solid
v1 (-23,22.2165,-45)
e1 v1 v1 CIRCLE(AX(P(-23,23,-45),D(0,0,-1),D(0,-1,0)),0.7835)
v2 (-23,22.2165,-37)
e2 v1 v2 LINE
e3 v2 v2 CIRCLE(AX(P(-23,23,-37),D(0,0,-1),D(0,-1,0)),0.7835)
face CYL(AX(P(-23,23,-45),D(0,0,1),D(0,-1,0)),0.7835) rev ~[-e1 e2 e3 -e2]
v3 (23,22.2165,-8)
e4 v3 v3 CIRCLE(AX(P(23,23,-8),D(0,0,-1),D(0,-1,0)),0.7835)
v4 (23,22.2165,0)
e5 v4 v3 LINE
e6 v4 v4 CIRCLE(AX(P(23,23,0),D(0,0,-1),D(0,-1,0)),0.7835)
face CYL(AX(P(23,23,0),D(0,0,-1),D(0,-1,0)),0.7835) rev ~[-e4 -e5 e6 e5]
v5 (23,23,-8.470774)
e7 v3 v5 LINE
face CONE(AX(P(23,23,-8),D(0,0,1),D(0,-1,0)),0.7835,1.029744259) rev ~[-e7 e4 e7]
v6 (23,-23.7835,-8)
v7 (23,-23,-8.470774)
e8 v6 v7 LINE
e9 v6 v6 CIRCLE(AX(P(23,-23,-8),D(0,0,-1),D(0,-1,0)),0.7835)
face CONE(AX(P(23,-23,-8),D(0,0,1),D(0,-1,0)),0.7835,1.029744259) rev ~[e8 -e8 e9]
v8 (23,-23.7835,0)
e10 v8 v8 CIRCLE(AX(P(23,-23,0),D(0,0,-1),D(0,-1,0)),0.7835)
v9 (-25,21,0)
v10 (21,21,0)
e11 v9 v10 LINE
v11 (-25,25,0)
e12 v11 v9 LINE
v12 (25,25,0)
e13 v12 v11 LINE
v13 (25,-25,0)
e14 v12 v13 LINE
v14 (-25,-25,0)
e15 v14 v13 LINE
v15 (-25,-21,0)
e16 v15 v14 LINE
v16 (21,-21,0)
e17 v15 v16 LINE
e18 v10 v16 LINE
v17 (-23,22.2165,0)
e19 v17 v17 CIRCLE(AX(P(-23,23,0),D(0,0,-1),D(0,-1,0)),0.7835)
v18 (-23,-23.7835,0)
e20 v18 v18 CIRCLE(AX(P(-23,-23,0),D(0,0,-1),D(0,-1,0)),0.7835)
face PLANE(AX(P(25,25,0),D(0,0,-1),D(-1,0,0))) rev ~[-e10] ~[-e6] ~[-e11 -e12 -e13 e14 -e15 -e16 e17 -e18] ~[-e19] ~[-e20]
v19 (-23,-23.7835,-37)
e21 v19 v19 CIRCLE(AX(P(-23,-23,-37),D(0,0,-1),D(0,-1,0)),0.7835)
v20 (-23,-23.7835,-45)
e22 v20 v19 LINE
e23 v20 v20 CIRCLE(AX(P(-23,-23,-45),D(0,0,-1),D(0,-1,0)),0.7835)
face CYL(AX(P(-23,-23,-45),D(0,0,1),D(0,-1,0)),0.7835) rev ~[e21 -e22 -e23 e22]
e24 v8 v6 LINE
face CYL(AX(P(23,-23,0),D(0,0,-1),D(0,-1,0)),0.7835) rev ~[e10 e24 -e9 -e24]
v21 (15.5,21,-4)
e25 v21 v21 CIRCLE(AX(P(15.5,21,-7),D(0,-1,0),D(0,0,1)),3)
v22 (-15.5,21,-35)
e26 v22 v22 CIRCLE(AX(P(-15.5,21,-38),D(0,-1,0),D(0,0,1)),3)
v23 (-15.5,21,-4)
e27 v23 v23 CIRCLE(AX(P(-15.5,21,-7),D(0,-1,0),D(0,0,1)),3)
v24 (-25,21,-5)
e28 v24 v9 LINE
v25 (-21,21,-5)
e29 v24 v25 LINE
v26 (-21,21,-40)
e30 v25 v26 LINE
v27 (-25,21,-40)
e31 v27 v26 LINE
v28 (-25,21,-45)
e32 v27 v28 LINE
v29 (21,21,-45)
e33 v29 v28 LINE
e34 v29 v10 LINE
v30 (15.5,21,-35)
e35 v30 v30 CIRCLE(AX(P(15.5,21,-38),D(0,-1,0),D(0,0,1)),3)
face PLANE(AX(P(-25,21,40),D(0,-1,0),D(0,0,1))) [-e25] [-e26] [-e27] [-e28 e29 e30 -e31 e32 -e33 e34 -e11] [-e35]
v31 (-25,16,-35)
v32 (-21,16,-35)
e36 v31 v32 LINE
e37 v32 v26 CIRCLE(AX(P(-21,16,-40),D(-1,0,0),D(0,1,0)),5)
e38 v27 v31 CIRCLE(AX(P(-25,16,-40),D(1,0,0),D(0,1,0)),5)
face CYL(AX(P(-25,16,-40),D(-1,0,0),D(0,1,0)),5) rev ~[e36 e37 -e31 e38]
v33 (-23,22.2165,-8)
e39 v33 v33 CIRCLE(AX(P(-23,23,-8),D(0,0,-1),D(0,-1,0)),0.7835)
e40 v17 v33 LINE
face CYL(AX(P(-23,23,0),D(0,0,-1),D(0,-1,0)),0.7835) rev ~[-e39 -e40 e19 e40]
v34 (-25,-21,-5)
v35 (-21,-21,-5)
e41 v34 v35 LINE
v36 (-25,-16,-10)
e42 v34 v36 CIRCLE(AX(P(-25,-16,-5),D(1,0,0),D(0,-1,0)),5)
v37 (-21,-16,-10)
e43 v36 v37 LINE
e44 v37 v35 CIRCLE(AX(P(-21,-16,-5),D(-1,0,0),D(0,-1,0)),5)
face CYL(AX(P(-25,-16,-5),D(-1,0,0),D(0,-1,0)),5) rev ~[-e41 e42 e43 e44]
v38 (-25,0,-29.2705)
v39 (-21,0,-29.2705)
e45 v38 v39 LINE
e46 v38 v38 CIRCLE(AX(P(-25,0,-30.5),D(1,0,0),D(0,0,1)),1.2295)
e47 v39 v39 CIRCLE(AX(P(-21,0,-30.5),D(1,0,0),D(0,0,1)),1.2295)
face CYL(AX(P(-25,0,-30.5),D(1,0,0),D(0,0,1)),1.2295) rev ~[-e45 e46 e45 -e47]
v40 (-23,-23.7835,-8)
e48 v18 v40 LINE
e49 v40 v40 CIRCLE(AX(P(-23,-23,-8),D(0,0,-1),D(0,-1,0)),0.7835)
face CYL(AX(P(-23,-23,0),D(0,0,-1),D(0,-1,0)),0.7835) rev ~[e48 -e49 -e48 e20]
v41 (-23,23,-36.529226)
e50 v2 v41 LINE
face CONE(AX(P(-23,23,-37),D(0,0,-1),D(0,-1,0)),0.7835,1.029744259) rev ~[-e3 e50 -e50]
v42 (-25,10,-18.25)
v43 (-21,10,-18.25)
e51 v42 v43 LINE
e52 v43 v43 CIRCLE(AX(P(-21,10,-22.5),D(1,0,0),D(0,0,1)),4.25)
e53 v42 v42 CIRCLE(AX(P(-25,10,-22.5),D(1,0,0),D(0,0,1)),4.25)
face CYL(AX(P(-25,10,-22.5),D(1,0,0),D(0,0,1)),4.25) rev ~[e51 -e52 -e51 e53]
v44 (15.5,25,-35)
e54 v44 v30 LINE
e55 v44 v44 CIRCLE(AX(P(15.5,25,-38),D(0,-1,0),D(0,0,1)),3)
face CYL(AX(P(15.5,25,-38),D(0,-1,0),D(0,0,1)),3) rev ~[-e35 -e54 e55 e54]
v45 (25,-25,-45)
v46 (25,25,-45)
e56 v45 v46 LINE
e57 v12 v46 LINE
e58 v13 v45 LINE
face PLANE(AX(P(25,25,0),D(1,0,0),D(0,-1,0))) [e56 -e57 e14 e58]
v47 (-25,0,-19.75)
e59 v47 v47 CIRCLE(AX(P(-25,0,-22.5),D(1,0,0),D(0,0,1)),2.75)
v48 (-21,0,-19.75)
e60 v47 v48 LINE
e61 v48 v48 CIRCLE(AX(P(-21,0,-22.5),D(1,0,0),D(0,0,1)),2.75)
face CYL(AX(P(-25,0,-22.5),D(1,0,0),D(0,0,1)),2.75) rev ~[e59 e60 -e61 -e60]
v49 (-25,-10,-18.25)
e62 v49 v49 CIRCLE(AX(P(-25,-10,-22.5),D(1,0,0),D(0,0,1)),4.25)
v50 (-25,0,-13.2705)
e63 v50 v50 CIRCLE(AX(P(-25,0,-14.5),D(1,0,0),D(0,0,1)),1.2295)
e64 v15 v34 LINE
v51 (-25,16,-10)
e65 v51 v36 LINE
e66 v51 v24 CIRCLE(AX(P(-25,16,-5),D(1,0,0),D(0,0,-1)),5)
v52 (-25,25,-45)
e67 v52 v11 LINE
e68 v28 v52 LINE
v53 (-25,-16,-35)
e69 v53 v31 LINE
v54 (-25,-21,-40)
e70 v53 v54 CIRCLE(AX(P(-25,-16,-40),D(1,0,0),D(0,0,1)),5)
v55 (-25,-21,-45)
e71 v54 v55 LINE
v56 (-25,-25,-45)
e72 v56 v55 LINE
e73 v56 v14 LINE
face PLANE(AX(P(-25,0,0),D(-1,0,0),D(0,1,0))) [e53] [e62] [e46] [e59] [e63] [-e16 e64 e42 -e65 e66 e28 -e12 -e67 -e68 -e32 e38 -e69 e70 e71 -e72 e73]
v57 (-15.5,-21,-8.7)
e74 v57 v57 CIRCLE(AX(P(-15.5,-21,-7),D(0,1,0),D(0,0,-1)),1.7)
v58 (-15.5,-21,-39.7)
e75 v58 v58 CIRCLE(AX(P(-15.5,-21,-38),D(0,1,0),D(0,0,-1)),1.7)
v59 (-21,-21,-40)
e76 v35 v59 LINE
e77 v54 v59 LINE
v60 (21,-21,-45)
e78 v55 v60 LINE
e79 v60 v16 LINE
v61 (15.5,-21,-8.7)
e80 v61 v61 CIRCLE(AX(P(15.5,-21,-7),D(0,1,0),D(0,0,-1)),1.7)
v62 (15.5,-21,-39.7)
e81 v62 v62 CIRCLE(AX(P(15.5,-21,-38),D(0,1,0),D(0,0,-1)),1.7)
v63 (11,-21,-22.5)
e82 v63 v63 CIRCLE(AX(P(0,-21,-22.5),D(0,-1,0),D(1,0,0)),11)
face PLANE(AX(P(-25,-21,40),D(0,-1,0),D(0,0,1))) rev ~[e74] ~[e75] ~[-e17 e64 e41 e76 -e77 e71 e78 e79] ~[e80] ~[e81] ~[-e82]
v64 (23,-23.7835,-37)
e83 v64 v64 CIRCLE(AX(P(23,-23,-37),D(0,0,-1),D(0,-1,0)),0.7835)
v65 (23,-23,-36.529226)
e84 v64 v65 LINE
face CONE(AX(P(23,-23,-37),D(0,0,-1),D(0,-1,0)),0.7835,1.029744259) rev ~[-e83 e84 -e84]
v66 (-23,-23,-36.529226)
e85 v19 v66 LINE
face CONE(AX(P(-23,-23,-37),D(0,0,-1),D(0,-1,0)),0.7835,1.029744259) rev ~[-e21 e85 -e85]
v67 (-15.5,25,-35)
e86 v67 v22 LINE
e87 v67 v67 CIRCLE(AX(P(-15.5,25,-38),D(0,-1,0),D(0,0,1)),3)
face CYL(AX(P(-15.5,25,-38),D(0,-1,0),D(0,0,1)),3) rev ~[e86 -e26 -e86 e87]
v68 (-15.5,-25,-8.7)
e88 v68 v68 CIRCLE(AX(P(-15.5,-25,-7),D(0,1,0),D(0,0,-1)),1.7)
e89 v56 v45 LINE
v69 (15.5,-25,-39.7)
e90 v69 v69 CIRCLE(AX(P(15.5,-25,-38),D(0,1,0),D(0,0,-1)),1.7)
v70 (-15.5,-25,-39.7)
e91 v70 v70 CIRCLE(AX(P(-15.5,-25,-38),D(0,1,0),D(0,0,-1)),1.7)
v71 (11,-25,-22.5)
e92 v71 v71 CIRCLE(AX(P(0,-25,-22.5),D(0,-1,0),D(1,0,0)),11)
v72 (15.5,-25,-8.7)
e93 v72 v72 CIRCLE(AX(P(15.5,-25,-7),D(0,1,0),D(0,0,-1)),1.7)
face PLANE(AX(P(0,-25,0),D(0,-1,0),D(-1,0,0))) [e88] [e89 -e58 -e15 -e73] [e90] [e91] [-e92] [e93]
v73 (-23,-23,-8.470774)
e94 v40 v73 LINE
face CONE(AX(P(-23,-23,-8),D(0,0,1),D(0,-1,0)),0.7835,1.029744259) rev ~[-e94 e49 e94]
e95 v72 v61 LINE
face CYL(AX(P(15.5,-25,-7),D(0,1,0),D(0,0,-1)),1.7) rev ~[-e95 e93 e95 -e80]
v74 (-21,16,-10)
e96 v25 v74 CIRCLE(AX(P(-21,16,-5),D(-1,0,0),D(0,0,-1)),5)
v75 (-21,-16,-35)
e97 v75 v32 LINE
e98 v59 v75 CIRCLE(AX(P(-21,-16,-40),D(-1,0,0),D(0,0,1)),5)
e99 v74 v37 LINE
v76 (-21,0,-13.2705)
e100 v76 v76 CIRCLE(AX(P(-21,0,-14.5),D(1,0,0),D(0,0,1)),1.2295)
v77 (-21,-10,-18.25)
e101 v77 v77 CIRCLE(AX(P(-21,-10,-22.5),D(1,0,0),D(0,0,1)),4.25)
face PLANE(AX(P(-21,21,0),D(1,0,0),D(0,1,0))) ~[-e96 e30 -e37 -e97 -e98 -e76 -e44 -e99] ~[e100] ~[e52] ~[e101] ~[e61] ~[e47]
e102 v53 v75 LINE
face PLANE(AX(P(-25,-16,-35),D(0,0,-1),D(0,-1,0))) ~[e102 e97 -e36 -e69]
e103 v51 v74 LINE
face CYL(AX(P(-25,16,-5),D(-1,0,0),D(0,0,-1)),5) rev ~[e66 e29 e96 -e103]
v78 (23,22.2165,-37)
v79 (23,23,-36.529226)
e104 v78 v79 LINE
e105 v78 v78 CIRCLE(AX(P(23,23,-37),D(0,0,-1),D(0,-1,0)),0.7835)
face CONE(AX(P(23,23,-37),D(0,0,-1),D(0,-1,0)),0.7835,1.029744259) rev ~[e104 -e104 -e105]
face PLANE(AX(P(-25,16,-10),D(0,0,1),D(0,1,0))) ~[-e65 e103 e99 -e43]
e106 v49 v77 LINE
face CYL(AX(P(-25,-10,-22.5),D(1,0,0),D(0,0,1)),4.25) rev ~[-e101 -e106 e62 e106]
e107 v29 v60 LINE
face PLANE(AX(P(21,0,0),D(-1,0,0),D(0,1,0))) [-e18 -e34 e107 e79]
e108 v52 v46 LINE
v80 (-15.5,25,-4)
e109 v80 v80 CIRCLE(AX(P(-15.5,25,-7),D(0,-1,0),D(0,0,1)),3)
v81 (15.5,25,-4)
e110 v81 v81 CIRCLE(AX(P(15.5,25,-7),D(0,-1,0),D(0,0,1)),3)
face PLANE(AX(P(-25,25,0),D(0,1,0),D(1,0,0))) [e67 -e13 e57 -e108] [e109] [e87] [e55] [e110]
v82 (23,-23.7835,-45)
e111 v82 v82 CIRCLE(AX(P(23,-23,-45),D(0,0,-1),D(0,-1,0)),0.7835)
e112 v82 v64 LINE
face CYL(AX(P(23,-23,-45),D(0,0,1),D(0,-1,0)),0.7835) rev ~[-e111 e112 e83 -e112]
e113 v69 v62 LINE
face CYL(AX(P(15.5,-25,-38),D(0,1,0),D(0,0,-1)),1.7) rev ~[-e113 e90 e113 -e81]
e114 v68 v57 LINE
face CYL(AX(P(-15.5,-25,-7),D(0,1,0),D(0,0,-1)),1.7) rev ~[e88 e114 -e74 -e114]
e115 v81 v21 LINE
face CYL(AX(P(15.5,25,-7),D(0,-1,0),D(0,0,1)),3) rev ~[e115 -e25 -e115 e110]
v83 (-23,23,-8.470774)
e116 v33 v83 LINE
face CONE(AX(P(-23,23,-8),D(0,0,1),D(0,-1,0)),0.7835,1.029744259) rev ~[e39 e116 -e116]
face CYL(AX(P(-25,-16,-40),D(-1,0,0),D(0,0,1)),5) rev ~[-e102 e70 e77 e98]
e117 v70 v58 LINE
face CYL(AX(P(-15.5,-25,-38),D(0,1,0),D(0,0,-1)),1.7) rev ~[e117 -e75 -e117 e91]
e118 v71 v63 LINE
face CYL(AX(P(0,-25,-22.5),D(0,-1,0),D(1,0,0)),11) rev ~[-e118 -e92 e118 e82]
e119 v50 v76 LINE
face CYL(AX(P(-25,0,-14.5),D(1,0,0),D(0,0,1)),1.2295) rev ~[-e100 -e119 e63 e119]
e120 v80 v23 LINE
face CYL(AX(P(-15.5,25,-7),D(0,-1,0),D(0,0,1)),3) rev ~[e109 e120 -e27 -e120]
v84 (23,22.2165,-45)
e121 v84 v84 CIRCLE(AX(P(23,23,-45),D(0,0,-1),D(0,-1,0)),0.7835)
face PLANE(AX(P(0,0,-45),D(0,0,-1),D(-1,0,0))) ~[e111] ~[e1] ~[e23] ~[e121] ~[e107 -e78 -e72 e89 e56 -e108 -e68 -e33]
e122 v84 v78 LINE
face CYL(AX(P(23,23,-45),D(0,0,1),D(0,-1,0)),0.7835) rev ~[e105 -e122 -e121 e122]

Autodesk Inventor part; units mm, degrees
ref_plane "YZ Plane" through (0, 0, 0) normal (1, 0, 0) x (0, 1, 0)
ref_plane "XZ Plane" through (0, 0, 0) normal (0, 1, 0) x (-1, 0, 0)
sketch "Skizze1" plane through (0, 0, 0) normal (0, 0, 1) x (1, 0, 0)
  line L0 (-25, 25) -> (25, 25)
  line L1 (25, 25) -> (25, -25)
  line L2 (25, -25) -> (-25, -25)
  line L3 (-25, -25) -> (-25, 25)
  line L4 (-35, 0) -> (35, 0) projected
  line L5 (0, -35) -> (0, 35) projected
  line L6 (21, 21) -> (-21, 21)
  line L7 (-21, 21) -> (-21, -21)
  line L8 (-21, -21) -> (21, -21)
  line L9 (21, -21) -> (21, 21)
  point P0 (0, 0)
  dimension "d0" = 50
  dimension "d1" = 50
  dimension "d2" = 4
extrude "Extrusion1" add sketch "Skizze1" along normal blind 45 contours L0 L5 L6 L7 L4 L3 | L0 L1 L4 L9 L6 L5 | L4 L7 L8 L5 L2 L3 | L1 L2 L5 L8 L9 L4
sketch "Skizze2" plane through (-25, -25, 0) normal (-1, 0, 0) x (0, 0, 1)
  line L0 (0, 50) -> (45, 50) projected
  line L1 (0, 0) -> (45, 0) projected
  line L2 (22.5, 50) -> (22.5, 0)
  line L3 (0, 46) -> (45, 46) projected
  line L4 (0, 4) -> (45, 4) projected
  line L5 (0, 46) -> (5, 46)
  line L6 (10, 41) -> (10, 9)
  line L7 (5, 4) -> (0, 4)
  line L8 (0, 4) -> (0, 46)
  line L9 (45, 4) -> (40, 4)
  line L10 (35, 9) -> (35, 41)
  line L11 (40, 46) -> (45, 46)
  line L12 (45, 46) -> (45, 4)
  arc A0 (40, 46) -> (35, 41) centre (40, 41) ccw
  arc A1 (35, 9) -> (40, 4) centre (40, 9) ccw
  arc A2 (5, 4) -> (10, 9) centre (5, 9) ccw
  arc A3 (10, 41) -> (5, 46) centre (5, 41) ccw
  point P0 (0, 25)
  point P1 (10, 4)
  point P2 (35, 46)
  dimension "d5" = 25
  dimension "d6" = 5
extrude "Extrusion2" cut sketch "Skizze2" against normal up to surface (46 mm away) contours A3 L6 A2 L4 L8 L3 | L3 L12 L4 A1 L10 A0
sketch "Skizze4" plane through (-25, -25, 0) normal (0, -1, 0) x (1, 0, 0)
  line L0 (50, 45) -> (0, 45) projected
  line L1 (0, 0) -> (0, 45) projected
  line L2 (50, 0) -> (50, 45) projected
  line L3 (0, 22.5) -> (50, 22.5)
  line L4 (25, 45) -> (25, 0)
  circle A0 centre (25, 22.5) radius 11
  dimension "d19" = 22
extrude "Extrusion3" cut sketch "Skizze4" against normal up to surface (46 mm away) contours A0 L3 L4 | L4 L3 A0 | A0 L4 L3 | L4 A0 L3
mirror "Spiegeln1" about plane through (0, 0, 0) normal (0, 0, 1) of "Extrusion1", "Extrusion2", "Extrusion3"
sketch "Skizze5" plane through (-25, 25, 45) normal (0, 1, 0) x (1, 0, 0)
  circle A0 centre (33.6603, 27.5) radius 3.45 projected
  circle A1 centre (16.3397, 27.5) radius 3.45 projected
  circle A2 centre (25, 12.5) radius 3.45 projected
  line L0 (0, 0) -> (50, 0) projected
  line L1 (50, 0) -> (50, 90) projected
  line L2 (60, 45) -> (-10, 45) projected
  line L3 (50, 45) -> (0, 45)
  line L4 (0, 45) -> (0, 0)
  line L5 (0, 0) -> (50, 0)
  line L6 (50, 0) -> (50, 45)
  point P0 (25, 45)
extrude "Extrusion4" cut sketch "Skizze5" against normal through all contours A0 | A1 | A2 | L4 L2 L1 L0
sketch "Skizze10" plane through (-25, -16, -10) normal (-1, 0, 0) x (0, 0, 1)
  circle A0 centre (-20.5, 16) radius 1.7 projected
  circle A1 centre (-4.5, 16) radius 1.7 projected
  point P0 (10, 16)
hole "Bohrung6" at (-25, 0, -14.5) at (-25, 0, -30.5) direction (1, 0, 0) diameter 2.459 end up to surface thread size "M3x0.5" class "6H" standard "ISO Metric profile"
sketch "Skizze11" plane through (-25, -16, -10) normal (-1, 0, 0) x (0, 0, 1)
  line L0 (0, 0) -> (0, 32) projected
  line L1 (-35, 41) -> (10, 41) projected
  line L2 (-25, 32) -> (-25, 0) projected
  line L3 (10, -9) -> (-35, -9) projected
  line L4 (-12.5, 41) -> (-12.5, -9)
  line L5 (0, 16) -> (-25, 16)
  point P0 (10, 16)
  point P1 (-12.5, 16)
hole "Bohrung7" at (-25, 0, -22.5) direction (1, 0, 0) diameter 5.5 end up to surface
sketch "Skizze12" plane through (-25, -16, -10) normal (-1, 0, 0) x (0, 0, 1)
  line L0 (0, 0) -> (0, 32) projected
  line L1 (-35, 41) -> (10, 41) projected
  line L2 (-25, 32) -> (-25, 0) projected
  line L3 (10, -9) -> (-35, -9) projected
  line L4 (-12.5, 41) -> (-12.5, -9)
  line L5 (-25, 16) -> (0, 16)
  point P0 (10, 16)
  point P1 (-12.5, 26)
  point P2 (-12.5, 6)
  dimension "d67" = 20
hole "Bohrung8" at (-25, 10, -22.5) at (-25, -10, -22.5) direction (1, 0, 0) diameter 8.5 end up to surface
sketch "Skizze13" plane through (-25, -25, -45) normal (0, -1, 0) x (1, 0, 0)
  circle A0 centre (25, 22.5) radius 11 projected
  line L0 (-10, 45) -> (60, 45) projected
  line L1 (25, 54) -> (25, -9) projected
  line L2 (9.5, 38) -> (40.5, 38)
  line L3 (40.5, 38) -> (40.5, 7)
  line L4 (40.5, 7) -> (9.5, 7)
  line L5 (9.5, 7) -> (9.5, 38)
  line L6 (25, 22.5) -> (30.7516, 22.5)
  point P0 (25, 45)
  dimension "d75" = 31
hole "Bohrung9" at (-15.5, -25, -7) at (15.5, -25, -7) at (15.5, -25, -38) at (-15.5, -25, -38) direction (0, 1, 0) diameter 3.4 end through all
sketch "Skizze14" plane through (-25, 25, -45) normal (0, 1, 0) x (1, 0, 0)
  circle A0 centre (9.5, -7) radius 1.7 projected
  circle A1 centre (40.5, -7) radius 1.7 projected
  circle A2 centre (40.5, -38) radius 1.7 projected
  circle A3 centre (9.5, -38) radius 1.7 projected
  point P0 (25, -45)
hole "Bohrung10" at (-15.5, 25, -38) at (15.5, 25, -38) at (15.5, 25, -7) at (-15.5, 25, -7) direction (0, -1, 0) diameter 6 depth 8 tip angle 118
sketch "Skizze15" plane through (-25, 25, 0) normal (0, 0, 1) x (1, 0, 0)
  line L0 (0, -50) -> (0, -46) projected
  line L1 (50, -50) -> (0, -50) projected
  line L2 (50, 0) -> (50, -50) projected
  line L3 (0, 0) -> (50, 0) projected
  line L4 (2, -2) -> (48, -2)
  line L5 (48, -2) -> (48, -48)
  line L6 (48, -48) -> (2, -48)
  line L7 (2, -48) -> (2, -2)
  point P0 (25, -25)
  dimension "d90" = 2
  dimension "d91" = 2
  dimension "d92" = 2
  dimension "d93" = 2
hole "Bohrung11" at (-23, 23, 0) at (23, 23, 0) at (23, -23, 0) at (-23, -23, 0) direction (0, 0, -1) diameter 1.567 depth 8 tip angle 118 thread size "M2x0.4" class "6H" standard "ISO Metric profile"
ref_plane "Arbeitsebene1" through (-25, 25, -22.5) normal (0, 0, 1) x (1, 0, 0)
mirror "Spiegeln2" about plane through (-25, 25, -22.5) normal (0, 0, 1) of "Bohrung11"
properties part number "1_0204_002"
